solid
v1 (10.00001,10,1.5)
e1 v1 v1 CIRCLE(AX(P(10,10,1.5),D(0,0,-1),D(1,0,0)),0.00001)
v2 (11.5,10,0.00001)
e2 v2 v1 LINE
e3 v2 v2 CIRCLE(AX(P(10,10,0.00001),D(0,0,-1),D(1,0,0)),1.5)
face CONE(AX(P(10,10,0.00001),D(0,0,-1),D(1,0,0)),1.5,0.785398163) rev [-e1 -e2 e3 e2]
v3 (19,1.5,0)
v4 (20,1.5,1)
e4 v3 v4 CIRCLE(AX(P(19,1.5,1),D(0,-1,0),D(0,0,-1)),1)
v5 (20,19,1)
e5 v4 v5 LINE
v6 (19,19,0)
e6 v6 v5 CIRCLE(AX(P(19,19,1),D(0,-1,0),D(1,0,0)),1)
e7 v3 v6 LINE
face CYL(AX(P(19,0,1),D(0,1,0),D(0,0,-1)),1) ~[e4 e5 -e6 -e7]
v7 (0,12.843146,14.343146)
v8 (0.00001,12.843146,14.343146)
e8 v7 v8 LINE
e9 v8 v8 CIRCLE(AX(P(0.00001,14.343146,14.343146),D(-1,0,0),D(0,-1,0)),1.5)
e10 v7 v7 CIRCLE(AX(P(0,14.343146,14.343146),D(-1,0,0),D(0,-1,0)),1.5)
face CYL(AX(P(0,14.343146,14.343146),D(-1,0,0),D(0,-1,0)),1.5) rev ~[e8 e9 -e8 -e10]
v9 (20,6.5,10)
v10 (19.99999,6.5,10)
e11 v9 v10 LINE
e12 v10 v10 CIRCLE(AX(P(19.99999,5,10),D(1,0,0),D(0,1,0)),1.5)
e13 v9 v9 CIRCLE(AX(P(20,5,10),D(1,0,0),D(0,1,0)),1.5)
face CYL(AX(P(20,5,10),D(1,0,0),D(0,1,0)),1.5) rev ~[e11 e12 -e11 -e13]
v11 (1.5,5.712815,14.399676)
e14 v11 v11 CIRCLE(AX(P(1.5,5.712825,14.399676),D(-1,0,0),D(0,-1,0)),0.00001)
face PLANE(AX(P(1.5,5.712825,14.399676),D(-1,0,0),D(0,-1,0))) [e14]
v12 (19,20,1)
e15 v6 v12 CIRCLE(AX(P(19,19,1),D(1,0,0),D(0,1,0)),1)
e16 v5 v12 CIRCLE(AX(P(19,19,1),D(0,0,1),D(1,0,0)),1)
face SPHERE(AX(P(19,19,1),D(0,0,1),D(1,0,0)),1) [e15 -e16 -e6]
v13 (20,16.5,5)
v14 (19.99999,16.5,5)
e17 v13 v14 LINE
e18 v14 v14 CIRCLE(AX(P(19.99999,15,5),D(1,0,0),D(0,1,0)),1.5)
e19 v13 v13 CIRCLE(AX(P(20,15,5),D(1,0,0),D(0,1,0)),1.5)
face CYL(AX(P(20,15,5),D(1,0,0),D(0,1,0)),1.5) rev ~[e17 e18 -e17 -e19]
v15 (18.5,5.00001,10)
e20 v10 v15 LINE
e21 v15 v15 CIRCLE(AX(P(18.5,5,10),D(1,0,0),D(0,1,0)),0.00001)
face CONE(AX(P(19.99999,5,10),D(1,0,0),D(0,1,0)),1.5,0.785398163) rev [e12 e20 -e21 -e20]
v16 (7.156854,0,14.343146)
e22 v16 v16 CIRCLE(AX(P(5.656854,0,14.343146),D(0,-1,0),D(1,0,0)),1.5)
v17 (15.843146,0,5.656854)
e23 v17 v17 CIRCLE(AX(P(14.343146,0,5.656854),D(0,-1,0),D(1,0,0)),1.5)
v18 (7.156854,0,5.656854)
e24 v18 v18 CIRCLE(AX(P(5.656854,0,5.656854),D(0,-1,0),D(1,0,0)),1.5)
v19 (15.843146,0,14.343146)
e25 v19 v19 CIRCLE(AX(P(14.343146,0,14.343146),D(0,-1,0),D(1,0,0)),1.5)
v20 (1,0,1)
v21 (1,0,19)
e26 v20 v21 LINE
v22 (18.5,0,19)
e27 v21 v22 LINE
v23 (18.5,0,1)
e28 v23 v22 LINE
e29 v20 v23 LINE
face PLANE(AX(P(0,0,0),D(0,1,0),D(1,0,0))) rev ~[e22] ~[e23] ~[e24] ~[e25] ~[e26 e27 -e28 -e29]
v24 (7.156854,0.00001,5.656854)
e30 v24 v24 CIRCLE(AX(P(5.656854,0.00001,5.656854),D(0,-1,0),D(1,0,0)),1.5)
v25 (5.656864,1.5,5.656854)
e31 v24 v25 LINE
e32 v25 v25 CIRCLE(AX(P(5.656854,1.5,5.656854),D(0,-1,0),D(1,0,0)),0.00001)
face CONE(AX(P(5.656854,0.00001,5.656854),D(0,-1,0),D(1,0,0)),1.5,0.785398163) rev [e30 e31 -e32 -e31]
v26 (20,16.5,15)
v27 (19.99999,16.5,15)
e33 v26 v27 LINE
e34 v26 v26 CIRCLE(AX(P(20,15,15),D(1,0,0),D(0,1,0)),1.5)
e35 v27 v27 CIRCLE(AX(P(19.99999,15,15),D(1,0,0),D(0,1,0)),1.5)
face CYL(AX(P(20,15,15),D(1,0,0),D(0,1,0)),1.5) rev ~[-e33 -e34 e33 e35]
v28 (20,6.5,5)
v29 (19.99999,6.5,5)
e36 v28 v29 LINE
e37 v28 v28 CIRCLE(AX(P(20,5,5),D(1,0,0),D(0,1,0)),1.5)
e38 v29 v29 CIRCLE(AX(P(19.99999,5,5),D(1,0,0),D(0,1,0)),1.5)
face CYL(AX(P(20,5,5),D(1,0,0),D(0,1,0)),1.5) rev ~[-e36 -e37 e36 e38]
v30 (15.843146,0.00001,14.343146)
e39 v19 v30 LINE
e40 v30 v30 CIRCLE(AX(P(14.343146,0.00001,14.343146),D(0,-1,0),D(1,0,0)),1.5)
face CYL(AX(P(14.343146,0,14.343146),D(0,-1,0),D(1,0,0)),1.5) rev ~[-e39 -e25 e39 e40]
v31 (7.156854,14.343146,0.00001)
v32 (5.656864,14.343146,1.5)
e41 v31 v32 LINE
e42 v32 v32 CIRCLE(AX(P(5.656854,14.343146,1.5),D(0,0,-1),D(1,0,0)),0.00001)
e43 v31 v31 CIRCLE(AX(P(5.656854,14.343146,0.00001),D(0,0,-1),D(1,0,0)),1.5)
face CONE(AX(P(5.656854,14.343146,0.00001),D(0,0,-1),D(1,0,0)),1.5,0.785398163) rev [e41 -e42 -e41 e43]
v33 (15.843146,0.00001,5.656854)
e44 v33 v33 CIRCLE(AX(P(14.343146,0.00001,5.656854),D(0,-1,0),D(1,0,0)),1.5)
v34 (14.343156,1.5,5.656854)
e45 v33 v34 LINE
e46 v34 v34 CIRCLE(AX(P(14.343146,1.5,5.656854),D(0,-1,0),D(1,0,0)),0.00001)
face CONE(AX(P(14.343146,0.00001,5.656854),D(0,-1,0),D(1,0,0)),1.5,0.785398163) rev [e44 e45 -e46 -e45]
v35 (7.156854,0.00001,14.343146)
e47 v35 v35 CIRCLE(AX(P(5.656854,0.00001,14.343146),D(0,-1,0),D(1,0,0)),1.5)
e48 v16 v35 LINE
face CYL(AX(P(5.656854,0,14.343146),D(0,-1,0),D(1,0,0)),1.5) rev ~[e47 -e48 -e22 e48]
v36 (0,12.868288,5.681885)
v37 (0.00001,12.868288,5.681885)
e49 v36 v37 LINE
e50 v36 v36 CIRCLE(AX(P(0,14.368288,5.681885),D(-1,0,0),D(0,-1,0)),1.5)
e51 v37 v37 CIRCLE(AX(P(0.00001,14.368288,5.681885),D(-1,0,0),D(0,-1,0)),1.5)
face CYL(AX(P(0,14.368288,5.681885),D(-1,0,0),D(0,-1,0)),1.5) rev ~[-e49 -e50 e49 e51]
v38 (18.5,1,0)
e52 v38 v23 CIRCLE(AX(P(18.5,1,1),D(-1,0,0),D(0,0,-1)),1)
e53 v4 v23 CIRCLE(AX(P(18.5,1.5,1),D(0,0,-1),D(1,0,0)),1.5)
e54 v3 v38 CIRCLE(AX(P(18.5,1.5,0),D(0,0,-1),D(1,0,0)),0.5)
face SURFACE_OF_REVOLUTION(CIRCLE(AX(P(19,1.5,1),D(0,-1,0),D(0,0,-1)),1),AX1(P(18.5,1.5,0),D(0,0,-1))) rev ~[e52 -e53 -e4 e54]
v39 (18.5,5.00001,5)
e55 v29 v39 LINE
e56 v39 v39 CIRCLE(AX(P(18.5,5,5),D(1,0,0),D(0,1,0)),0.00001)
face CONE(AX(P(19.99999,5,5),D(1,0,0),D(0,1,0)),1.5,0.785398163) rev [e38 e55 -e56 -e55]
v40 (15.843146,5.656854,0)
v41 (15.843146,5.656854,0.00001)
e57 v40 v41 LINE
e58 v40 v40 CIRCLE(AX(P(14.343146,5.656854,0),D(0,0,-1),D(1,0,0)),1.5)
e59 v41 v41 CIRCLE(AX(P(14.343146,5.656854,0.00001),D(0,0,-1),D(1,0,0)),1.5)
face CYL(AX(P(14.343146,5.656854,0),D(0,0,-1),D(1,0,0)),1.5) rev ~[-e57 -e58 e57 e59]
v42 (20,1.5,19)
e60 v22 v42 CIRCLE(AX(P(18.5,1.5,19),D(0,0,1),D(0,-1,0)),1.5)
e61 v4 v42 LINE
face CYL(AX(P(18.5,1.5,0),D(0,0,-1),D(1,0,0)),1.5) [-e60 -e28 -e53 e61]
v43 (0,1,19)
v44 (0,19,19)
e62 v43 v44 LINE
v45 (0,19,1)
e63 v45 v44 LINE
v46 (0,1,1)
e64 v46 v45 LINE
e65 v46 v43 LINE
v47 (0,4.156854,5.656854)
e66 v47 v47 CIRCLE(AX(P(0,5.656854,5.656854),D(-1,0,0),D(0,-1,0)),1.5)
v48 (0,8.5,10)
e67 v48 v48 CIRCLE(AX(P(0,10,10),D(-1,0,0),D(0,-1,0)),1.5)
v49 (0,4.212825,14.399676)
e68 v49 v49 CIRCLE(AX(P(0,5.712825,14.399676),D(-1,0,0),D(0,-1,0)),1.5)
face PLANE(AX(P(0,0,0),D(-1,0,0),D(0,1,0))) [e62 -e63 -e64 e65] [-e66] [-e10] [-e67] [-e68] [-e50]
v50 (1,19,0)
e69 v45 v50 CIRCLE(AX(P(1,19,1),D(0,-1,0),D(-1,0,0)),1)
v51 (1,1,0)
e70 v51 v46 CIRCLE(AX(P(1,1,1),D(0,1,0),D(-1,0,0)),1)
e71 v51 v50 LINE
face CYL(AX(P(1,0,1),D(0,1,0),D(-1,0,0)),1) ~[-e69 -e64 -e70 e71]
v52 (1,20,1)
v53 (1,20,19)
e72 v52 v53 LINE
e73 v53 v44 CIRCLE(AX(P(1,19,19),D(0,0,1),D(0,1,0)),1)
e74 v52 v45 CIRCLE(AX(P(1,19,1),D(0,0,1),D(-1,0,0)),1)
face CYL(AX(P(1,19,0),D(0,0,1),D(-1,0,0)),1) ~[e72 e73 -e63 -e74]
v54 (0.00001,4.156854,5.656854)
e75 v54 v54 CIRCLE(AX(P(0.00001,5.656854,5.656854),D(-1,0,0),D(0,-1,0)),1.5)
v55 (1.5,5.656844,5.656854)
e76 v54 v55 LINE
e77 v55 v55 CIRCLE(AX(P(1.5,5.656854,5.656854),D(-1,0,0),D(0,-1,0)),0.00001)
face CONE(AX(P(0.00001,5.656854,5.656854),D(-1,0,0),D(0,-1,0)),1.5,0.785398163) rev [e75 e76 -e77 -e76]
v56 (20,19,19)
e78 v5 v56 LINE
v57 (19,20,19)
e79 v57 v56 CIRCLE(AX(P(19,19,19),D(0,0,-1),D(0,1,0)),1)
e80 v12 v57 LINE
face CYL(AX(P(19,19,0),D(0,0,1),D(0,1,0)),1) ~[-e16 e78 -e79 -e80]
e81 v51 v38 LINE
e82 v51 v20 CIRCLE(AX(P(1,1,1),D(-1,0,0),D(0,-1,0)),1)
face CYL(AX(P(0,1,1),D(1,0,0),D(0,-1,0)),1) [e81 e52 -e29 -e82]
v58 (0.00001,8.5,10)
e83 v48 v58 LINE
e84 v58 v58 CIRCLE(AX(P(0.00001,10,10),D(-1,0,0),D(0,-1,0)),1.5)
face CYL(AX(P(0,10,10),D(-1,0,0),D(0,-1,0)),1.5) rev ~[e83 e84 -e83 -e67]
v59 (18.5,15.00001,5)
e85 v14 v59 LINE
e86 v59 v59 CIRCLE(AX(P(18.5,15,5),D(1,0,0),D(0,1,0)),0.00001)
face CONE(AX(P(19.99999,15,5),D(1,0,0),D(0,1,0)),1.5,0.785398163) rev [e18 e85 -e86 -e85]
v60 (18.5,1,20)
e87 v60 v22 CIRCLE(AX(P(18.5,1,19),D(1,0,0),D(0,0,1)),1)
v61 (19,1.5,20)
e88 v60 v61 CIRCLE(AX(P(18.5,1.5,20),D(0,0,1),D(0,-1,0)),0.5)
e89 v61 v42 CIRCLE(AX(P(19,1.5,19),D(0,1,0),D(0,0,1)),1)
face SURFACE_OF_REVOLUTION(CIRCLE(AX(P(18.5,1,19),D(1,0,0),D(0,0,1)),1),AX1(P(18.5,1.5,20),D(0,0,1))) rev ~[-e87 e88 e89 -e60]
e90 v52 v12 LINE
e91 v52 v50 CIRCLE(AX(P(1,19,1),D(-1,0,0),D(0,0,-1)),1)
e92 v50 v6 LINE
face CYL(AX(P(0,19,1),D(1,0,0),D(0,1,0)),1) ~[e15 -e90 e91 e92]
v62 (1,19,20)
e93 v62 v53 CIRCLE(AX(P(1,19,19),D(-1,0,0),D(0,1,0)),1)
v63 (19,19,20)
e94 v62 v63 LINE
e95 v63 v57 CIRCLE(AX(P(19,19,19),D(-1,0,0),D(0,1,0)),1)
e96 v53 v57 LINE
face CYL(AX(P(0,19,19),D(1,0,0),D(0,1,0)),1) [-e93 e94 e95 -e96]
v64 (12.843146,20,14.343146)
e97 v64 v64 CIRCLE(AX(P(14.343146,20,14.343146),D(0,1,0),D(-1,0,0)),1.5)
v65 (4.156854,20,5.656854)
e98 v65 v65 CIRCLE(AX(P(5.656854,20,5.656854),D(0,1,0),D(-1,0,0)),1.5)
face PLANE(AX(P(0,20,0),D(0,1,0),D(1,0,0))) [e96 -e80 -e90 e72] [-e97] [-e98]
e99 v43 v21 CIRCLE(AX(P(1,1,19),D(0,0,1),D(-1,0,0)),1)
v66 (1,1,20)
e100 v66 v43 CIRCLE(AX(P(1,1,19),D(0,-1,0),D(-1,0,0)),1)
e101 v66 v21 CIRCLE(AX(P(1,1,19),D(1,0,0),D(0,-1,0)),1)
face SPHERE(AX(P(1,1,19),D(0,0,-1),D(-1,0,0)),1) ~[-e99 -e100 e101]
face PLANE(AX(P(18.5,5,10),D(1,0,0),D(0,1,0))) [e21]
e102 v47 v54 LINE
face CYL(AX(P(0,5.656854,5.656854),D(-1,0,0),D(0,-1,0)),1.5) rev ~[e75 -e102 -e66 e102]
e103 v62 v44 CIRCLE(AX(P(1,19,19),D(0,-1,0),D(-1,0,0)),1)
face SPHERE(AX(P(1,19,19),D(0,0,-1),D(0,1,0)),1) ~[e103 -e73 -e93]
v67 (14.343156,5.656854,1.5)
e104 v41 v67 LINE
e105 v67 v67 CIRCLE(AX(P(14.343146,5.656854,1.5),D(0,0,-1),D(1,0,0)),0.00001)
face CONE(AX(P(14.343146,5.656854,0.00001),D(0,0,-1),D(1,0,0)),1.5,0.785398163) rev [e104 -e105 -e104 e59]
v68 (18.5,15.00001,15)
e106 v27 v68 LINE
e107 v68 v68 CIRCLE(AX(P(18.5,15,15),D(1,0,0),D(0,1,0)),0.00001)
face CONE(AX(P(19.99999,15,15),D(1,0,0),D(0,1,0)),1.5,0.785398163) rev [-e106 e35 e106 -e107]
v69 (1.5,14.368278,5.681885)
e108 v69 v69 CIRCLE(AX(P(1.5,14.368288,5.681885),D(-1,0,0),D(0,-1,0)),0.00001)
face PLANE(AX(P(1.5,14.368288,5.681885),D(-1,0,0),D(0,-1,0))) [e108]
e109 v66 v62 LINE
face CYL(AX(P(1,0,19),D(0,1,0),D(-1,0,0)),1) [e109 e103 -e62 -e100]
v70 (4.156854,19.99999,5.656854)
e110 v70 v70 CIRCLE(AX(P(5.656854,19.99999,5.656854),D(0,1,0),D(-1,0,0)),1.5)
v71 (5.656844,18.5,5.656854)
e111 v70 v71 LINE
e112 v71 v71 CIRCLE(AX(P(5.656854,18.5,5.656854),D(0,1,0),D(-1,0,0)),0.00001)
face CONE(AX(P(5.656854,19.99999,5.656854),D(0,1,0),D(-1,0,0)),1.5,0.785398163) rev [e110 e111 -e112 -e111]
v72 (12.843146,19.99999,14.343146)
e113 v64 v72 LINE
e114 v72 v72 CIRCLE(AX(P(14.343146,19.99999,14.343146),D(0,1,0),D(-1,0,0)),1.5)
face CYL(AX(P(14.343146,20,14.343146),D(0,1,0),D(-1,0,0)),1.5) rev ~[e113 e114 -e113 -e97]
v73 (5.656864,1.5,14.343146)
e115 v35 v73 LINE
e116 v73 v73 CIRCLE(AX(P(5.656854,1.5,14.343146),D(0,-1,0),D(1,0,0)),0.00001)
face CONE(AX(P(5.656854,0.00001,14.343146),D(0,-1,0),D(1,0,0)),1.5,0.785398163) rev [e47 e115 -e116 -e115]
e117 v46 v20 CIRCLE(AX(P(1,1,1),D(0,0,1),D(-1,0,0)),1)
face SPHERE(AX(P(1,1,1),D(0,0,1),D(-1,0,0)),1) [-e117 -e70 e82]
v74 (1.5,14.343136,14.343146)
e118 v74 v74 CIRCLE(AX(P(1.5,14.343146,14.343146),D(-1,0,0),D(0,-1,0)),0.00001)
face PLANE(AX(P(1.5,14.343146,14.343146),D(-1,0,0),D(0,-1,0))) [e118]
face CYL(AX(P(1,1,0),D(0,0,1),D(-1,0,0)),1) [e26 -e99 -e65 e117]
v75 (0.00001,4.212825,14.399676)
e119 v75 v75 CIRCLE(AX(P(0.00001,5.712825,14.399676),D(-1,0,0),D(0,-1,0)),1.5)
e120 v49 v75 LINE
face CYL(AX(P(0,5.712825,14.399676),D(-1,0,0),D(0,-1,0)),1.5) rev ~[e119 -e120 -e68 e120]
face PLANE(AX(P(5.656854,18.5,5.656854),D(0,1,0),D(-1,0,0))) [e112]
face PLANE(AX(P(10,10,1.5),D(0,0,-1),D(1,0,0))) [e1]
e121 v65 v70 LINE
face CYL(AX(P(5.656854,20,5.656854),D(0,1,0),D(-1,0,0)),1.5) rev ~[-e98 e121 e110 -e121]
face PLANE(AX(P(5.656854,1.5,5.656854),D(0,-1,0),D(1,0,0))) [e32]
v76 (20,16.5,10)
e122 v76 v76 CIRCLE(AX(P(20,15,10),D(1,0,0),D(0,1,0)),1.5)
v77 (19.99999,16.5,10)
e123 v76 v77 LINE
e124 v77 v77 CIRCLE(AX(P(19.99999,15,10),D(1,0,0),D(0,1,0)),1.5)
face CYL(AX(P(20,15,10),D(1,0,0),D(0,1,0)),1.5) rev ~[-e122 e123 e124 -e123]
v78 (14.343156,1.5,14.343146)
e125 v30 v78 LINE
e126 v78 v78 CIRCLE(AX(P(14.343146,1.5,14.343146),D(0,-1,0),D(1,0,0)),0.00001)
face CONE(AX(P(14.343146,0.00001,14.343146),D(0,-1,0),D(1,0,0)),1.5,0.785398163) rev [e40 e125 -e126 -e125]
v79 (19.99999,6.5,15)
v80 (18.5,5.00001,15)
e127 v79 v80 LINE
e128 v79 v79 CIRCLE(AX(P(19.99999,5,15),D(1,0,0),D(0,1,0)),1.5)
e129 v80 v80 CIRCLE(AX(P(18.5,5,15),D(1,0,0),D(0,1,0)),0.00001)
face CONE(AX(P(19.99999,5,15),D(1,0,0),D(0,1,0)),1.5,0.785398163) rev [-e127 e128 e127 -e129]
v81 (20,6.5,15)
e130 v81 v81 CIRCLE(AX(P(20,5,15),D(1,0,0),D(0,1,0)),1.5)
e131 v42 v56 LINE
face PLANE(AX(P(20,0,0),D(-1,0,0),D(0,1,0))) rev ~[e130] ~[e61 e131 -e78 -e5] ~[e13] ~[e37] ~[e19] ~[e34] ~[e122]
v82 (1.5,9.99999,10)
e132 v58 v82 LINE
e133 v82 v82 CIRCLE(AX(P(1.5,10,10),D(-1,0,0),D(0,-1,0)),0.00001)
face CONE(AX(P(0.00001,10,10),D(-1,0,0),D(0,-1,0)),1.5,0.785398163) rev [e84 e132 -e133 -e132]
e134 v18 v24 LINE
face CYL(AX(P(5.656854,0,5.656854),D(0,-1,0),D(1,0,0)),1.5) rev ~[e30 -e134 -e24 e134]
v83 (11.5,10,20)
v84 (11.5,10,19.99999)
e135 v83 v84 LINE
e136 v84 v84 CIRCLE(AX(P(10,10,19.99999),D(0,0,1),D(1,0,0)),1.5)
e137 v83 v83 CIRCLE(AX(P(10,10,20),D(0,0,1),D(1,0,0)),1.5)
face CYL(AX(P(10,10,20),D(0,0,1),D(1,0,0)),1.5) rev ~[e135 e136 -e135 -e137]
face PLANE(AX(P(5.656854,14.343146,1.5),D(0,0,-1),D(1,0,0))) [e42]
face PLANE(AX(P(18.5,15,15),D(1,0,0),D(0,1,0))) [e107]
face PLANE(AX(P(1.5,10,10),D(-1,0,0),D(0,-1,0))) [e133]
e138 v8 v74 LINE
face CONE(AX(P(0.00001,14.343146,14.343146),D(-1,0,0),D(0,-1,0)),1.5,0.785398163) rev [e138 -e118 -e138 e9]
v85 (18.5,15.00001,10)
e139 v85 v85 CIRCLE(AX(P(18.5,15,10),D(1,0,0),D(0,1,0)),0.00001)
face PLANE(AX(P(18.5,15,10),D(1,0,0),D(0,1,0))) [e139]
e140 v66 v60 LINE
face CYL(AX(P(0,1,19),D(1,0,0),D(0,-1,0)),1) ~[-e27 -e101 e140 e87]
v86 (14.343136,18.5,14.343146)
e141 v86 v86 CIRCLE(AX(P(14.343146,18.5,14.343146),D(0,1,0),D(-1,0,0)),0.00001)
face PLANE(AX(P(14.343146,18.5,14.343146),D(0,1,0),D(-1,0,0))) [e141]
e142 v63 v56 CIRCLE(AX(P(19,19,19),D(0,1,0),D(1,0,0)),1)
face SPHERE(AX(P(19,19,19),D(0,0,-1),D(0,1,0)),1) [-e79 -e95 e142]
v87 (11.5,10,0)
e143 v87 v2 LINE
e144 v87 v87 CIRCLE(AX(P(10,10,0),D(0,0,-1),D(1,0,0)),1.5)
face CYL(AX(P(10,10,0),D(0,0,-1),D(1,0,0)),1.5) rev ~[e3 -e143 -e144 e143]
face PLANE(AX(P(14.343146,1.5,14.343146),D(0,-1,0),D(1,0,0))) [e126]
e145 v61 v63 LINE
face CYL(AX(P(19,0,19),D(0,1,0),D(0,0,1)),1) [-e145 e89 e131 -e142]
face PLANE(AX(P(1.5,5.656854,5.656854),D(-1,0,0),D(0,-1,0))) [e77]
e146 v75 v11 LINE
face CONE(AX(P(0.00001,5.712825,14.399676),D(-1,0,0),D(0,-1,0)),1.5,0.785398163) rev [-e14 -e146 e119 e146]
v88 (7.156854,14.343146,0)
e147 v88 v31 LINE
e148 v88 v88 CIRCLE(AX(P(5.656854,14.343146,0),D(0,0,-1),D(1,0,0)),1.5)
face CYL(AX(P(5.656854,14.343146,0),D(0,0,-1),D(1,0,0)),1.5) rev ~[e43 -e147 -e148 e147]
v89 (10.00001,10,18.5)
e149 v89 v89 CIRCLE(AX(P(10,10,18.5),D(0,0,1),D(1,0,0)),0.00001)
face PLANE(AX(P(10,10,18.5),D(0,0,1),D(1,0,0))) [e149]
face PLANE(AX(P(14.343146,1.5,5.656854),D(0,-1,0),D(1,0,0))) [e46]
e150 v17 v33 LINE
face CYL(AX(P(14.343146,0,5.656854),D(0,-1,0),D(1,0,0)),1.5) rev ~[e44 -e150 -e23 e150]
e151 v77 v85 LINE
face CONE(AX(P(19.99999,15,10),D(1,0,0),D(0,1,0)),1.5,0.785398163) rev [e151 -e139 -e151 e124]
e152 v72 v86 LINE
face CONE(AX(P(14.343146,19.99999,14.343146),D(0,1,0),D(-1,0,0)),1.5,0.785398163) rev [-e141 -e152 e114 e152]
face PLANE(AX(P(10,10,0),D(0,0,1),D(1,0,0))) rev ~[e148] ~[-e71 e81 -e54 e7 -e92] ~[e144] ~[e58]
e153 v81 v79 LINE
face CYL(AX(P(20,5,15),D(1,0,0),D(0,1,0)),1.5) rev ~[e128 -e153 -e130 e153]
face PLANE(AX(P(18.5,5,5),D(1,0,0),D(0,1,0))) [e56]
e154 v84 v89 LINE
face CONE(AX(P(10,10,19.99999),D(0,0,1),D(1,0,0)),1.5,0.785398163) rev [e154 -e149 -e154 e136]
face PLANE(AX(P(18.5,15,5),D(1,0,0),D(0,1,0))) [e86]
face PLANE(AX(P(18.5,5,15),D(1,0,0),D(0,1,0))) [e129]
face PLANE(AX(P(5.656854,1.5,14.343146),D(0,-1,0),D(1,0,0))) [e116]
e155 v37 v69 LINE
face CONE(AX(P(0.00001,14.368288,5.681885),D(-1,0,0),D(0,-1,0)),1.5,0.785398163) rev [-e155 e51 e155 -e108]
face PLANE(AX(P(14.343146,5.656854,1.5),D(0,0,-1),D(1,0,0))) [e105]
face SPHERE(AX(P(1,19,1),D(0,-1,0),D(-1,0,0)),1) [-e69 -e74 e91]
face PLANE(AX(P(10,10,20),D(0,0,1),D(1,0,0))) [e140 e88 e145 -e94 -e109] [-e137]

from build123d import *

# Parameters (mm, degrees)
F0_W         = 20
F0_H         = 20
F1_DEPTH     = 20
F2_R         = 1.5
F3_DEPTH     = 1.5
F4_R         = 1.5
F5_DEPTH     = 1.5
F6_R         = 1
F7_SIZE      = 1.49999
F8_R         = 1.5
F9_DEPTH     = 1.5
F10_SIZE     = 1.49999
F11_SIZE     = 1.49999
F12_T1_DEPTH = 20
F12_T4_ANGLE = 90
F12_T6_ANGLE = 90
F13_SIZE     = 1.49999
F14_R        = 1.5
F15_DEPTH    = 1.5
F16_SIZE     = 1.49999
F17_R        = 1.5
F18_DEPTH    = 1.5
F19_SIZE     = 1.49999
F20_R        = 1.5
F21_DEPTH    = 1.5
F22_SIZE     = 1.49999


# Not quite as in the source:
# - a fillet or chamfer that OpenCascade refuses, or shapes differently, is made with other operations: its cross-section is extruded or revolved along the edge and cut away or added
# - a fillet or chamfer is up to 0.001 mm smaller than in the source, because OpenCascade refuses the exact size


with BuildPart() as f1:
    # F0 (on Top) → F1 (new body)
    with BuildSketch(Plane.XY):
        with Locations((10, 10)):
            Rectangle(F0_W, F0_H)
    extrude(amount=F1_DEPTH)

    # F2 (on face) → F3 (cut)
    with BuildSketch(Plane.XY.offset(20)):
        with Locations((10, 10)):
            Circle(F2_R)
    extrude(amount=-F3_DEPTH, mode=Mode.SUBTRACT)

    # F4 (on face) → F5 (cut)
    with BuildSketch(Plane(origin=(0, 20, 0), x_dir=(-1, 0, 0), z_dir=(0, 1, 0))):
        with Locations((-14.3431457505, 14.3431457505)):
            Circle(F4_R)
        with Locations((-5.6568542495, 5.6568542495)):
            Circle(F4_R)
    extrude(amount=-F5_DEPTH, mode=Mode.SUBTRACT)

    # F6
    f6_edges = [f1.edges().sort_by_distance(p)[0] for p in [
        (0, 0, 10),
        (0, 10, 0),
        (20, 20, 10),
        (0, 20, 10),
        (10, 20, 20),
        (0, 10, 20),
        (10, 0, 0),
        (20, 10, 0),
        (20, 10, 20),
        (10, 0, 20),
        (10, 20, 0),
    ]]
    fillet(f6_edges, radius=F6_R)

    # F7 (size 1.5 in the source; OpenCascade refuses exactly that, so slightly less here)
    f7_edges = [f1.edges().sort_by_distance(p)[0] for p in [
        (7.156854, 18.5, 5.656854),
    ]]
    chamfer(f7_edges, length=F7_SIZE)

    # F8 (on face) → F9 (cut)
    with BuildSketch(Plane(origin=(0, 0, 0), x_dir=(1, 0, 0), z_dir=(0, 0, -1))):
        with Locations((5.6568542495, -14.3431457505)):
            Circle(F8_R)
        with Locations((10, -10)):
            Circle(F8_R)
        with Locations((14.3431457505, -5.6568542495)):
            Circle(F8_R)
    extrude(amount=-F9_DEPTH, mode=Mode.SUBTRACT)

    # F10 (size 1.5 in the source; OpenCascade refuses exactly that, so slightly less here)
    f10_edges = [f1.edges().sort_by_distance(p)[0] for p in [
        (15.843146, 18.5, 14.343146),
    ]]
    chamfer(f10_edges, length=F10_SIZE)

    # F11 (size 1.5 in the source; OpenCascade refuses exactly that, so slightly less here)
    f11_edges = [f1.edges().sort_by_distance(p)[0] for p in [
        (8.5, 10, 18.5),
    ]]
    chamfer(f11_edges, length=F11_SIZE)

    # F12: fillet of radius 1.5 on 1 edges, made by hand

    # F12_s2 → F12_t1 (cut)
    with BuildSketch(Plane.XY):
        with BuildLine():
            ThreePointArc((20, 1.5), (19.5606601718, 0.4393398282), (18.5, 0))
            Line((18.5, 0), (20, 0))
            Line((20, 0), (20, 1.5))
        make_face()
    extrude(amount=F12_T1_DEPTH, mode=Mode.SUBTRACT)

    # F12_s3 → F12_t4 (revolve, cut)
    with BuildSketch(Plane.XZ.offset(-1.5)):
        with BuildLine():
            ThreePointArc((19, 0), (19.7071067812, 0.2928932188), (20, 1))
            Line((20, 1), (20, 0))
            Line((20, 0), (19, 0))
        make_face()
    revolve(axis=Axis((18.5, 1.5, 0), (0, 0, -1)), revolution_arc=F12_T4_ANGLE, mode=Mode.SUBTRACT)

    # F12_s5 → F12_t6 (revolve, cut)
    with BuildSketch(Plane.YZ.offset(18.5)):
        with BuildLine():
            ThreePointArc((1, 20), (0.2928932188, 19.7071067812), (0, 19))
            Line((0, 19), (0, 20))
            Line((0, 20), (1, 20))
        make_face()
    revolve(axis=Axis((18.5, 1.5, 20), (0, 0, 1)), revolution_arc=F12_T6_ANGLE, mode=Mode.SUBTRACT)

    # F13 (size 1.5 in the source; OpenCascade refuses exactly that, so slightly less here)
    f13_edges = [f1.edges().sort_by_distance(p)[0] for p in [
        (4.156854, 14.343146, 1.5),
        (8.5, 10, 1.5),
        (12.843146, 5.656854, 1.5),
    ]]
    chamfer(f13_edges, length=F13_SIZE)

    # F14 (on face) → F15 (cut)
    with BuildSketch(Plane.XZ):
        with Locations((5.6568542495, 5.6568542495)):
            Circle(F14_R)
        with Locations((5.6568542495, 14.3431457505)):
            Circle(F14_R)
        with Locations((14.3431457505, 14.3431457505)):
            Circle(F14_R)
        with Locations((14.3431457505, 5.6568542495)):
            Circle(F14_R)
    extrude(amount=-F15_DEPTH, mode=Mode.SUBTRACT)

    # F16 (size 1.5 in the source; OpenCascade refuses exactly that, so slightly less here)
    f16_edges = [f1.edges().sort_by_distance(p)[0] for p in [
        (4.156854, 1.5, 14.343146),
        (12.843146, 1.5, 14.343146),
        (4.156854, 1.5, 5.656854),
        (12.843146, 1.5, 5.656854),
    ]]
    chamfer(f16_edges, length=F16_SIZE)

    # F17 (on face) → F18 (cut)
    with BuildSketch(Plane(origin=(0, 0, 0), x_dir=(0, -1, 0), z_dir=(-1, 0, 0))):
        with Locations((-14.3431457505, 14.3431457505)):
            Circle(F17_R)
        with Locations((-5.7128249468, 14.3996758016)):
            Circle(F17_R)
        with Locations((-10, 10)):
            Circle(F17_R)
        with Locations((-14.3682878079, 5.6818850556)):
            Circle(F17_R)
        with Locations((-5.6568542495, 5.6568542495)):
            Circle(F17_R)
    extrude(amount=-F18_DEPTH, mode=Mode.SUBTRACT)

    # F19 (size 1.5 in the source; OpenCascade refuses exactly that, so slightly less here)
    f19_edges = [f1.edges().sort_by_distance(p)[0] for p in [
        (1.5, 15.843146, 14.343146),
        (1.5, 15.868288, 5.681885),
        (1.5, 11.5, 10),
        (1.5, 7.212825, 14.399676),
        (1.5, 7.156854, 5.656854),
    ]]
    chamfer(f19_edges, length=F19_SIZE)

    # F20 (on face) → F21 (cut)
    with BuildSketch(Plane.YZ.offset(20)):
        with Locations((15, 15)):
            Circle(F20_R)
        with Locations((5, 15)):
            Circle(F20_R)
        with Locations((5, 10)):
            Circle(F20_R)
        with Locations((15, 10)):
            Circle(F20_R)
        with Locations((15, 5)):
            Circle(F20_R)
        with Locations((5, 5)):
            Circle(F20_R)
    extrude(amount=-F21_DEPTH, mode=Mode.SUBTRACT)

    # F22 (size 1.5 in the source; OpenCascade refuses exactly that, so slightly less here)
    f22_edges = [f1.edges().sort_by_distance(p)[0] for p in [
        (18.5, 13.5, 5),
        (18.5, 13.5, 10),
        (18.5, 3.5, 10),
        (18.5, 3.5, 5),
        (18.5, 3.5, 15),
        (18.5, 13.5, 15),
    ]]
    chamfer(f22_edges, length=F22_SIZE)


solid = f1.part
